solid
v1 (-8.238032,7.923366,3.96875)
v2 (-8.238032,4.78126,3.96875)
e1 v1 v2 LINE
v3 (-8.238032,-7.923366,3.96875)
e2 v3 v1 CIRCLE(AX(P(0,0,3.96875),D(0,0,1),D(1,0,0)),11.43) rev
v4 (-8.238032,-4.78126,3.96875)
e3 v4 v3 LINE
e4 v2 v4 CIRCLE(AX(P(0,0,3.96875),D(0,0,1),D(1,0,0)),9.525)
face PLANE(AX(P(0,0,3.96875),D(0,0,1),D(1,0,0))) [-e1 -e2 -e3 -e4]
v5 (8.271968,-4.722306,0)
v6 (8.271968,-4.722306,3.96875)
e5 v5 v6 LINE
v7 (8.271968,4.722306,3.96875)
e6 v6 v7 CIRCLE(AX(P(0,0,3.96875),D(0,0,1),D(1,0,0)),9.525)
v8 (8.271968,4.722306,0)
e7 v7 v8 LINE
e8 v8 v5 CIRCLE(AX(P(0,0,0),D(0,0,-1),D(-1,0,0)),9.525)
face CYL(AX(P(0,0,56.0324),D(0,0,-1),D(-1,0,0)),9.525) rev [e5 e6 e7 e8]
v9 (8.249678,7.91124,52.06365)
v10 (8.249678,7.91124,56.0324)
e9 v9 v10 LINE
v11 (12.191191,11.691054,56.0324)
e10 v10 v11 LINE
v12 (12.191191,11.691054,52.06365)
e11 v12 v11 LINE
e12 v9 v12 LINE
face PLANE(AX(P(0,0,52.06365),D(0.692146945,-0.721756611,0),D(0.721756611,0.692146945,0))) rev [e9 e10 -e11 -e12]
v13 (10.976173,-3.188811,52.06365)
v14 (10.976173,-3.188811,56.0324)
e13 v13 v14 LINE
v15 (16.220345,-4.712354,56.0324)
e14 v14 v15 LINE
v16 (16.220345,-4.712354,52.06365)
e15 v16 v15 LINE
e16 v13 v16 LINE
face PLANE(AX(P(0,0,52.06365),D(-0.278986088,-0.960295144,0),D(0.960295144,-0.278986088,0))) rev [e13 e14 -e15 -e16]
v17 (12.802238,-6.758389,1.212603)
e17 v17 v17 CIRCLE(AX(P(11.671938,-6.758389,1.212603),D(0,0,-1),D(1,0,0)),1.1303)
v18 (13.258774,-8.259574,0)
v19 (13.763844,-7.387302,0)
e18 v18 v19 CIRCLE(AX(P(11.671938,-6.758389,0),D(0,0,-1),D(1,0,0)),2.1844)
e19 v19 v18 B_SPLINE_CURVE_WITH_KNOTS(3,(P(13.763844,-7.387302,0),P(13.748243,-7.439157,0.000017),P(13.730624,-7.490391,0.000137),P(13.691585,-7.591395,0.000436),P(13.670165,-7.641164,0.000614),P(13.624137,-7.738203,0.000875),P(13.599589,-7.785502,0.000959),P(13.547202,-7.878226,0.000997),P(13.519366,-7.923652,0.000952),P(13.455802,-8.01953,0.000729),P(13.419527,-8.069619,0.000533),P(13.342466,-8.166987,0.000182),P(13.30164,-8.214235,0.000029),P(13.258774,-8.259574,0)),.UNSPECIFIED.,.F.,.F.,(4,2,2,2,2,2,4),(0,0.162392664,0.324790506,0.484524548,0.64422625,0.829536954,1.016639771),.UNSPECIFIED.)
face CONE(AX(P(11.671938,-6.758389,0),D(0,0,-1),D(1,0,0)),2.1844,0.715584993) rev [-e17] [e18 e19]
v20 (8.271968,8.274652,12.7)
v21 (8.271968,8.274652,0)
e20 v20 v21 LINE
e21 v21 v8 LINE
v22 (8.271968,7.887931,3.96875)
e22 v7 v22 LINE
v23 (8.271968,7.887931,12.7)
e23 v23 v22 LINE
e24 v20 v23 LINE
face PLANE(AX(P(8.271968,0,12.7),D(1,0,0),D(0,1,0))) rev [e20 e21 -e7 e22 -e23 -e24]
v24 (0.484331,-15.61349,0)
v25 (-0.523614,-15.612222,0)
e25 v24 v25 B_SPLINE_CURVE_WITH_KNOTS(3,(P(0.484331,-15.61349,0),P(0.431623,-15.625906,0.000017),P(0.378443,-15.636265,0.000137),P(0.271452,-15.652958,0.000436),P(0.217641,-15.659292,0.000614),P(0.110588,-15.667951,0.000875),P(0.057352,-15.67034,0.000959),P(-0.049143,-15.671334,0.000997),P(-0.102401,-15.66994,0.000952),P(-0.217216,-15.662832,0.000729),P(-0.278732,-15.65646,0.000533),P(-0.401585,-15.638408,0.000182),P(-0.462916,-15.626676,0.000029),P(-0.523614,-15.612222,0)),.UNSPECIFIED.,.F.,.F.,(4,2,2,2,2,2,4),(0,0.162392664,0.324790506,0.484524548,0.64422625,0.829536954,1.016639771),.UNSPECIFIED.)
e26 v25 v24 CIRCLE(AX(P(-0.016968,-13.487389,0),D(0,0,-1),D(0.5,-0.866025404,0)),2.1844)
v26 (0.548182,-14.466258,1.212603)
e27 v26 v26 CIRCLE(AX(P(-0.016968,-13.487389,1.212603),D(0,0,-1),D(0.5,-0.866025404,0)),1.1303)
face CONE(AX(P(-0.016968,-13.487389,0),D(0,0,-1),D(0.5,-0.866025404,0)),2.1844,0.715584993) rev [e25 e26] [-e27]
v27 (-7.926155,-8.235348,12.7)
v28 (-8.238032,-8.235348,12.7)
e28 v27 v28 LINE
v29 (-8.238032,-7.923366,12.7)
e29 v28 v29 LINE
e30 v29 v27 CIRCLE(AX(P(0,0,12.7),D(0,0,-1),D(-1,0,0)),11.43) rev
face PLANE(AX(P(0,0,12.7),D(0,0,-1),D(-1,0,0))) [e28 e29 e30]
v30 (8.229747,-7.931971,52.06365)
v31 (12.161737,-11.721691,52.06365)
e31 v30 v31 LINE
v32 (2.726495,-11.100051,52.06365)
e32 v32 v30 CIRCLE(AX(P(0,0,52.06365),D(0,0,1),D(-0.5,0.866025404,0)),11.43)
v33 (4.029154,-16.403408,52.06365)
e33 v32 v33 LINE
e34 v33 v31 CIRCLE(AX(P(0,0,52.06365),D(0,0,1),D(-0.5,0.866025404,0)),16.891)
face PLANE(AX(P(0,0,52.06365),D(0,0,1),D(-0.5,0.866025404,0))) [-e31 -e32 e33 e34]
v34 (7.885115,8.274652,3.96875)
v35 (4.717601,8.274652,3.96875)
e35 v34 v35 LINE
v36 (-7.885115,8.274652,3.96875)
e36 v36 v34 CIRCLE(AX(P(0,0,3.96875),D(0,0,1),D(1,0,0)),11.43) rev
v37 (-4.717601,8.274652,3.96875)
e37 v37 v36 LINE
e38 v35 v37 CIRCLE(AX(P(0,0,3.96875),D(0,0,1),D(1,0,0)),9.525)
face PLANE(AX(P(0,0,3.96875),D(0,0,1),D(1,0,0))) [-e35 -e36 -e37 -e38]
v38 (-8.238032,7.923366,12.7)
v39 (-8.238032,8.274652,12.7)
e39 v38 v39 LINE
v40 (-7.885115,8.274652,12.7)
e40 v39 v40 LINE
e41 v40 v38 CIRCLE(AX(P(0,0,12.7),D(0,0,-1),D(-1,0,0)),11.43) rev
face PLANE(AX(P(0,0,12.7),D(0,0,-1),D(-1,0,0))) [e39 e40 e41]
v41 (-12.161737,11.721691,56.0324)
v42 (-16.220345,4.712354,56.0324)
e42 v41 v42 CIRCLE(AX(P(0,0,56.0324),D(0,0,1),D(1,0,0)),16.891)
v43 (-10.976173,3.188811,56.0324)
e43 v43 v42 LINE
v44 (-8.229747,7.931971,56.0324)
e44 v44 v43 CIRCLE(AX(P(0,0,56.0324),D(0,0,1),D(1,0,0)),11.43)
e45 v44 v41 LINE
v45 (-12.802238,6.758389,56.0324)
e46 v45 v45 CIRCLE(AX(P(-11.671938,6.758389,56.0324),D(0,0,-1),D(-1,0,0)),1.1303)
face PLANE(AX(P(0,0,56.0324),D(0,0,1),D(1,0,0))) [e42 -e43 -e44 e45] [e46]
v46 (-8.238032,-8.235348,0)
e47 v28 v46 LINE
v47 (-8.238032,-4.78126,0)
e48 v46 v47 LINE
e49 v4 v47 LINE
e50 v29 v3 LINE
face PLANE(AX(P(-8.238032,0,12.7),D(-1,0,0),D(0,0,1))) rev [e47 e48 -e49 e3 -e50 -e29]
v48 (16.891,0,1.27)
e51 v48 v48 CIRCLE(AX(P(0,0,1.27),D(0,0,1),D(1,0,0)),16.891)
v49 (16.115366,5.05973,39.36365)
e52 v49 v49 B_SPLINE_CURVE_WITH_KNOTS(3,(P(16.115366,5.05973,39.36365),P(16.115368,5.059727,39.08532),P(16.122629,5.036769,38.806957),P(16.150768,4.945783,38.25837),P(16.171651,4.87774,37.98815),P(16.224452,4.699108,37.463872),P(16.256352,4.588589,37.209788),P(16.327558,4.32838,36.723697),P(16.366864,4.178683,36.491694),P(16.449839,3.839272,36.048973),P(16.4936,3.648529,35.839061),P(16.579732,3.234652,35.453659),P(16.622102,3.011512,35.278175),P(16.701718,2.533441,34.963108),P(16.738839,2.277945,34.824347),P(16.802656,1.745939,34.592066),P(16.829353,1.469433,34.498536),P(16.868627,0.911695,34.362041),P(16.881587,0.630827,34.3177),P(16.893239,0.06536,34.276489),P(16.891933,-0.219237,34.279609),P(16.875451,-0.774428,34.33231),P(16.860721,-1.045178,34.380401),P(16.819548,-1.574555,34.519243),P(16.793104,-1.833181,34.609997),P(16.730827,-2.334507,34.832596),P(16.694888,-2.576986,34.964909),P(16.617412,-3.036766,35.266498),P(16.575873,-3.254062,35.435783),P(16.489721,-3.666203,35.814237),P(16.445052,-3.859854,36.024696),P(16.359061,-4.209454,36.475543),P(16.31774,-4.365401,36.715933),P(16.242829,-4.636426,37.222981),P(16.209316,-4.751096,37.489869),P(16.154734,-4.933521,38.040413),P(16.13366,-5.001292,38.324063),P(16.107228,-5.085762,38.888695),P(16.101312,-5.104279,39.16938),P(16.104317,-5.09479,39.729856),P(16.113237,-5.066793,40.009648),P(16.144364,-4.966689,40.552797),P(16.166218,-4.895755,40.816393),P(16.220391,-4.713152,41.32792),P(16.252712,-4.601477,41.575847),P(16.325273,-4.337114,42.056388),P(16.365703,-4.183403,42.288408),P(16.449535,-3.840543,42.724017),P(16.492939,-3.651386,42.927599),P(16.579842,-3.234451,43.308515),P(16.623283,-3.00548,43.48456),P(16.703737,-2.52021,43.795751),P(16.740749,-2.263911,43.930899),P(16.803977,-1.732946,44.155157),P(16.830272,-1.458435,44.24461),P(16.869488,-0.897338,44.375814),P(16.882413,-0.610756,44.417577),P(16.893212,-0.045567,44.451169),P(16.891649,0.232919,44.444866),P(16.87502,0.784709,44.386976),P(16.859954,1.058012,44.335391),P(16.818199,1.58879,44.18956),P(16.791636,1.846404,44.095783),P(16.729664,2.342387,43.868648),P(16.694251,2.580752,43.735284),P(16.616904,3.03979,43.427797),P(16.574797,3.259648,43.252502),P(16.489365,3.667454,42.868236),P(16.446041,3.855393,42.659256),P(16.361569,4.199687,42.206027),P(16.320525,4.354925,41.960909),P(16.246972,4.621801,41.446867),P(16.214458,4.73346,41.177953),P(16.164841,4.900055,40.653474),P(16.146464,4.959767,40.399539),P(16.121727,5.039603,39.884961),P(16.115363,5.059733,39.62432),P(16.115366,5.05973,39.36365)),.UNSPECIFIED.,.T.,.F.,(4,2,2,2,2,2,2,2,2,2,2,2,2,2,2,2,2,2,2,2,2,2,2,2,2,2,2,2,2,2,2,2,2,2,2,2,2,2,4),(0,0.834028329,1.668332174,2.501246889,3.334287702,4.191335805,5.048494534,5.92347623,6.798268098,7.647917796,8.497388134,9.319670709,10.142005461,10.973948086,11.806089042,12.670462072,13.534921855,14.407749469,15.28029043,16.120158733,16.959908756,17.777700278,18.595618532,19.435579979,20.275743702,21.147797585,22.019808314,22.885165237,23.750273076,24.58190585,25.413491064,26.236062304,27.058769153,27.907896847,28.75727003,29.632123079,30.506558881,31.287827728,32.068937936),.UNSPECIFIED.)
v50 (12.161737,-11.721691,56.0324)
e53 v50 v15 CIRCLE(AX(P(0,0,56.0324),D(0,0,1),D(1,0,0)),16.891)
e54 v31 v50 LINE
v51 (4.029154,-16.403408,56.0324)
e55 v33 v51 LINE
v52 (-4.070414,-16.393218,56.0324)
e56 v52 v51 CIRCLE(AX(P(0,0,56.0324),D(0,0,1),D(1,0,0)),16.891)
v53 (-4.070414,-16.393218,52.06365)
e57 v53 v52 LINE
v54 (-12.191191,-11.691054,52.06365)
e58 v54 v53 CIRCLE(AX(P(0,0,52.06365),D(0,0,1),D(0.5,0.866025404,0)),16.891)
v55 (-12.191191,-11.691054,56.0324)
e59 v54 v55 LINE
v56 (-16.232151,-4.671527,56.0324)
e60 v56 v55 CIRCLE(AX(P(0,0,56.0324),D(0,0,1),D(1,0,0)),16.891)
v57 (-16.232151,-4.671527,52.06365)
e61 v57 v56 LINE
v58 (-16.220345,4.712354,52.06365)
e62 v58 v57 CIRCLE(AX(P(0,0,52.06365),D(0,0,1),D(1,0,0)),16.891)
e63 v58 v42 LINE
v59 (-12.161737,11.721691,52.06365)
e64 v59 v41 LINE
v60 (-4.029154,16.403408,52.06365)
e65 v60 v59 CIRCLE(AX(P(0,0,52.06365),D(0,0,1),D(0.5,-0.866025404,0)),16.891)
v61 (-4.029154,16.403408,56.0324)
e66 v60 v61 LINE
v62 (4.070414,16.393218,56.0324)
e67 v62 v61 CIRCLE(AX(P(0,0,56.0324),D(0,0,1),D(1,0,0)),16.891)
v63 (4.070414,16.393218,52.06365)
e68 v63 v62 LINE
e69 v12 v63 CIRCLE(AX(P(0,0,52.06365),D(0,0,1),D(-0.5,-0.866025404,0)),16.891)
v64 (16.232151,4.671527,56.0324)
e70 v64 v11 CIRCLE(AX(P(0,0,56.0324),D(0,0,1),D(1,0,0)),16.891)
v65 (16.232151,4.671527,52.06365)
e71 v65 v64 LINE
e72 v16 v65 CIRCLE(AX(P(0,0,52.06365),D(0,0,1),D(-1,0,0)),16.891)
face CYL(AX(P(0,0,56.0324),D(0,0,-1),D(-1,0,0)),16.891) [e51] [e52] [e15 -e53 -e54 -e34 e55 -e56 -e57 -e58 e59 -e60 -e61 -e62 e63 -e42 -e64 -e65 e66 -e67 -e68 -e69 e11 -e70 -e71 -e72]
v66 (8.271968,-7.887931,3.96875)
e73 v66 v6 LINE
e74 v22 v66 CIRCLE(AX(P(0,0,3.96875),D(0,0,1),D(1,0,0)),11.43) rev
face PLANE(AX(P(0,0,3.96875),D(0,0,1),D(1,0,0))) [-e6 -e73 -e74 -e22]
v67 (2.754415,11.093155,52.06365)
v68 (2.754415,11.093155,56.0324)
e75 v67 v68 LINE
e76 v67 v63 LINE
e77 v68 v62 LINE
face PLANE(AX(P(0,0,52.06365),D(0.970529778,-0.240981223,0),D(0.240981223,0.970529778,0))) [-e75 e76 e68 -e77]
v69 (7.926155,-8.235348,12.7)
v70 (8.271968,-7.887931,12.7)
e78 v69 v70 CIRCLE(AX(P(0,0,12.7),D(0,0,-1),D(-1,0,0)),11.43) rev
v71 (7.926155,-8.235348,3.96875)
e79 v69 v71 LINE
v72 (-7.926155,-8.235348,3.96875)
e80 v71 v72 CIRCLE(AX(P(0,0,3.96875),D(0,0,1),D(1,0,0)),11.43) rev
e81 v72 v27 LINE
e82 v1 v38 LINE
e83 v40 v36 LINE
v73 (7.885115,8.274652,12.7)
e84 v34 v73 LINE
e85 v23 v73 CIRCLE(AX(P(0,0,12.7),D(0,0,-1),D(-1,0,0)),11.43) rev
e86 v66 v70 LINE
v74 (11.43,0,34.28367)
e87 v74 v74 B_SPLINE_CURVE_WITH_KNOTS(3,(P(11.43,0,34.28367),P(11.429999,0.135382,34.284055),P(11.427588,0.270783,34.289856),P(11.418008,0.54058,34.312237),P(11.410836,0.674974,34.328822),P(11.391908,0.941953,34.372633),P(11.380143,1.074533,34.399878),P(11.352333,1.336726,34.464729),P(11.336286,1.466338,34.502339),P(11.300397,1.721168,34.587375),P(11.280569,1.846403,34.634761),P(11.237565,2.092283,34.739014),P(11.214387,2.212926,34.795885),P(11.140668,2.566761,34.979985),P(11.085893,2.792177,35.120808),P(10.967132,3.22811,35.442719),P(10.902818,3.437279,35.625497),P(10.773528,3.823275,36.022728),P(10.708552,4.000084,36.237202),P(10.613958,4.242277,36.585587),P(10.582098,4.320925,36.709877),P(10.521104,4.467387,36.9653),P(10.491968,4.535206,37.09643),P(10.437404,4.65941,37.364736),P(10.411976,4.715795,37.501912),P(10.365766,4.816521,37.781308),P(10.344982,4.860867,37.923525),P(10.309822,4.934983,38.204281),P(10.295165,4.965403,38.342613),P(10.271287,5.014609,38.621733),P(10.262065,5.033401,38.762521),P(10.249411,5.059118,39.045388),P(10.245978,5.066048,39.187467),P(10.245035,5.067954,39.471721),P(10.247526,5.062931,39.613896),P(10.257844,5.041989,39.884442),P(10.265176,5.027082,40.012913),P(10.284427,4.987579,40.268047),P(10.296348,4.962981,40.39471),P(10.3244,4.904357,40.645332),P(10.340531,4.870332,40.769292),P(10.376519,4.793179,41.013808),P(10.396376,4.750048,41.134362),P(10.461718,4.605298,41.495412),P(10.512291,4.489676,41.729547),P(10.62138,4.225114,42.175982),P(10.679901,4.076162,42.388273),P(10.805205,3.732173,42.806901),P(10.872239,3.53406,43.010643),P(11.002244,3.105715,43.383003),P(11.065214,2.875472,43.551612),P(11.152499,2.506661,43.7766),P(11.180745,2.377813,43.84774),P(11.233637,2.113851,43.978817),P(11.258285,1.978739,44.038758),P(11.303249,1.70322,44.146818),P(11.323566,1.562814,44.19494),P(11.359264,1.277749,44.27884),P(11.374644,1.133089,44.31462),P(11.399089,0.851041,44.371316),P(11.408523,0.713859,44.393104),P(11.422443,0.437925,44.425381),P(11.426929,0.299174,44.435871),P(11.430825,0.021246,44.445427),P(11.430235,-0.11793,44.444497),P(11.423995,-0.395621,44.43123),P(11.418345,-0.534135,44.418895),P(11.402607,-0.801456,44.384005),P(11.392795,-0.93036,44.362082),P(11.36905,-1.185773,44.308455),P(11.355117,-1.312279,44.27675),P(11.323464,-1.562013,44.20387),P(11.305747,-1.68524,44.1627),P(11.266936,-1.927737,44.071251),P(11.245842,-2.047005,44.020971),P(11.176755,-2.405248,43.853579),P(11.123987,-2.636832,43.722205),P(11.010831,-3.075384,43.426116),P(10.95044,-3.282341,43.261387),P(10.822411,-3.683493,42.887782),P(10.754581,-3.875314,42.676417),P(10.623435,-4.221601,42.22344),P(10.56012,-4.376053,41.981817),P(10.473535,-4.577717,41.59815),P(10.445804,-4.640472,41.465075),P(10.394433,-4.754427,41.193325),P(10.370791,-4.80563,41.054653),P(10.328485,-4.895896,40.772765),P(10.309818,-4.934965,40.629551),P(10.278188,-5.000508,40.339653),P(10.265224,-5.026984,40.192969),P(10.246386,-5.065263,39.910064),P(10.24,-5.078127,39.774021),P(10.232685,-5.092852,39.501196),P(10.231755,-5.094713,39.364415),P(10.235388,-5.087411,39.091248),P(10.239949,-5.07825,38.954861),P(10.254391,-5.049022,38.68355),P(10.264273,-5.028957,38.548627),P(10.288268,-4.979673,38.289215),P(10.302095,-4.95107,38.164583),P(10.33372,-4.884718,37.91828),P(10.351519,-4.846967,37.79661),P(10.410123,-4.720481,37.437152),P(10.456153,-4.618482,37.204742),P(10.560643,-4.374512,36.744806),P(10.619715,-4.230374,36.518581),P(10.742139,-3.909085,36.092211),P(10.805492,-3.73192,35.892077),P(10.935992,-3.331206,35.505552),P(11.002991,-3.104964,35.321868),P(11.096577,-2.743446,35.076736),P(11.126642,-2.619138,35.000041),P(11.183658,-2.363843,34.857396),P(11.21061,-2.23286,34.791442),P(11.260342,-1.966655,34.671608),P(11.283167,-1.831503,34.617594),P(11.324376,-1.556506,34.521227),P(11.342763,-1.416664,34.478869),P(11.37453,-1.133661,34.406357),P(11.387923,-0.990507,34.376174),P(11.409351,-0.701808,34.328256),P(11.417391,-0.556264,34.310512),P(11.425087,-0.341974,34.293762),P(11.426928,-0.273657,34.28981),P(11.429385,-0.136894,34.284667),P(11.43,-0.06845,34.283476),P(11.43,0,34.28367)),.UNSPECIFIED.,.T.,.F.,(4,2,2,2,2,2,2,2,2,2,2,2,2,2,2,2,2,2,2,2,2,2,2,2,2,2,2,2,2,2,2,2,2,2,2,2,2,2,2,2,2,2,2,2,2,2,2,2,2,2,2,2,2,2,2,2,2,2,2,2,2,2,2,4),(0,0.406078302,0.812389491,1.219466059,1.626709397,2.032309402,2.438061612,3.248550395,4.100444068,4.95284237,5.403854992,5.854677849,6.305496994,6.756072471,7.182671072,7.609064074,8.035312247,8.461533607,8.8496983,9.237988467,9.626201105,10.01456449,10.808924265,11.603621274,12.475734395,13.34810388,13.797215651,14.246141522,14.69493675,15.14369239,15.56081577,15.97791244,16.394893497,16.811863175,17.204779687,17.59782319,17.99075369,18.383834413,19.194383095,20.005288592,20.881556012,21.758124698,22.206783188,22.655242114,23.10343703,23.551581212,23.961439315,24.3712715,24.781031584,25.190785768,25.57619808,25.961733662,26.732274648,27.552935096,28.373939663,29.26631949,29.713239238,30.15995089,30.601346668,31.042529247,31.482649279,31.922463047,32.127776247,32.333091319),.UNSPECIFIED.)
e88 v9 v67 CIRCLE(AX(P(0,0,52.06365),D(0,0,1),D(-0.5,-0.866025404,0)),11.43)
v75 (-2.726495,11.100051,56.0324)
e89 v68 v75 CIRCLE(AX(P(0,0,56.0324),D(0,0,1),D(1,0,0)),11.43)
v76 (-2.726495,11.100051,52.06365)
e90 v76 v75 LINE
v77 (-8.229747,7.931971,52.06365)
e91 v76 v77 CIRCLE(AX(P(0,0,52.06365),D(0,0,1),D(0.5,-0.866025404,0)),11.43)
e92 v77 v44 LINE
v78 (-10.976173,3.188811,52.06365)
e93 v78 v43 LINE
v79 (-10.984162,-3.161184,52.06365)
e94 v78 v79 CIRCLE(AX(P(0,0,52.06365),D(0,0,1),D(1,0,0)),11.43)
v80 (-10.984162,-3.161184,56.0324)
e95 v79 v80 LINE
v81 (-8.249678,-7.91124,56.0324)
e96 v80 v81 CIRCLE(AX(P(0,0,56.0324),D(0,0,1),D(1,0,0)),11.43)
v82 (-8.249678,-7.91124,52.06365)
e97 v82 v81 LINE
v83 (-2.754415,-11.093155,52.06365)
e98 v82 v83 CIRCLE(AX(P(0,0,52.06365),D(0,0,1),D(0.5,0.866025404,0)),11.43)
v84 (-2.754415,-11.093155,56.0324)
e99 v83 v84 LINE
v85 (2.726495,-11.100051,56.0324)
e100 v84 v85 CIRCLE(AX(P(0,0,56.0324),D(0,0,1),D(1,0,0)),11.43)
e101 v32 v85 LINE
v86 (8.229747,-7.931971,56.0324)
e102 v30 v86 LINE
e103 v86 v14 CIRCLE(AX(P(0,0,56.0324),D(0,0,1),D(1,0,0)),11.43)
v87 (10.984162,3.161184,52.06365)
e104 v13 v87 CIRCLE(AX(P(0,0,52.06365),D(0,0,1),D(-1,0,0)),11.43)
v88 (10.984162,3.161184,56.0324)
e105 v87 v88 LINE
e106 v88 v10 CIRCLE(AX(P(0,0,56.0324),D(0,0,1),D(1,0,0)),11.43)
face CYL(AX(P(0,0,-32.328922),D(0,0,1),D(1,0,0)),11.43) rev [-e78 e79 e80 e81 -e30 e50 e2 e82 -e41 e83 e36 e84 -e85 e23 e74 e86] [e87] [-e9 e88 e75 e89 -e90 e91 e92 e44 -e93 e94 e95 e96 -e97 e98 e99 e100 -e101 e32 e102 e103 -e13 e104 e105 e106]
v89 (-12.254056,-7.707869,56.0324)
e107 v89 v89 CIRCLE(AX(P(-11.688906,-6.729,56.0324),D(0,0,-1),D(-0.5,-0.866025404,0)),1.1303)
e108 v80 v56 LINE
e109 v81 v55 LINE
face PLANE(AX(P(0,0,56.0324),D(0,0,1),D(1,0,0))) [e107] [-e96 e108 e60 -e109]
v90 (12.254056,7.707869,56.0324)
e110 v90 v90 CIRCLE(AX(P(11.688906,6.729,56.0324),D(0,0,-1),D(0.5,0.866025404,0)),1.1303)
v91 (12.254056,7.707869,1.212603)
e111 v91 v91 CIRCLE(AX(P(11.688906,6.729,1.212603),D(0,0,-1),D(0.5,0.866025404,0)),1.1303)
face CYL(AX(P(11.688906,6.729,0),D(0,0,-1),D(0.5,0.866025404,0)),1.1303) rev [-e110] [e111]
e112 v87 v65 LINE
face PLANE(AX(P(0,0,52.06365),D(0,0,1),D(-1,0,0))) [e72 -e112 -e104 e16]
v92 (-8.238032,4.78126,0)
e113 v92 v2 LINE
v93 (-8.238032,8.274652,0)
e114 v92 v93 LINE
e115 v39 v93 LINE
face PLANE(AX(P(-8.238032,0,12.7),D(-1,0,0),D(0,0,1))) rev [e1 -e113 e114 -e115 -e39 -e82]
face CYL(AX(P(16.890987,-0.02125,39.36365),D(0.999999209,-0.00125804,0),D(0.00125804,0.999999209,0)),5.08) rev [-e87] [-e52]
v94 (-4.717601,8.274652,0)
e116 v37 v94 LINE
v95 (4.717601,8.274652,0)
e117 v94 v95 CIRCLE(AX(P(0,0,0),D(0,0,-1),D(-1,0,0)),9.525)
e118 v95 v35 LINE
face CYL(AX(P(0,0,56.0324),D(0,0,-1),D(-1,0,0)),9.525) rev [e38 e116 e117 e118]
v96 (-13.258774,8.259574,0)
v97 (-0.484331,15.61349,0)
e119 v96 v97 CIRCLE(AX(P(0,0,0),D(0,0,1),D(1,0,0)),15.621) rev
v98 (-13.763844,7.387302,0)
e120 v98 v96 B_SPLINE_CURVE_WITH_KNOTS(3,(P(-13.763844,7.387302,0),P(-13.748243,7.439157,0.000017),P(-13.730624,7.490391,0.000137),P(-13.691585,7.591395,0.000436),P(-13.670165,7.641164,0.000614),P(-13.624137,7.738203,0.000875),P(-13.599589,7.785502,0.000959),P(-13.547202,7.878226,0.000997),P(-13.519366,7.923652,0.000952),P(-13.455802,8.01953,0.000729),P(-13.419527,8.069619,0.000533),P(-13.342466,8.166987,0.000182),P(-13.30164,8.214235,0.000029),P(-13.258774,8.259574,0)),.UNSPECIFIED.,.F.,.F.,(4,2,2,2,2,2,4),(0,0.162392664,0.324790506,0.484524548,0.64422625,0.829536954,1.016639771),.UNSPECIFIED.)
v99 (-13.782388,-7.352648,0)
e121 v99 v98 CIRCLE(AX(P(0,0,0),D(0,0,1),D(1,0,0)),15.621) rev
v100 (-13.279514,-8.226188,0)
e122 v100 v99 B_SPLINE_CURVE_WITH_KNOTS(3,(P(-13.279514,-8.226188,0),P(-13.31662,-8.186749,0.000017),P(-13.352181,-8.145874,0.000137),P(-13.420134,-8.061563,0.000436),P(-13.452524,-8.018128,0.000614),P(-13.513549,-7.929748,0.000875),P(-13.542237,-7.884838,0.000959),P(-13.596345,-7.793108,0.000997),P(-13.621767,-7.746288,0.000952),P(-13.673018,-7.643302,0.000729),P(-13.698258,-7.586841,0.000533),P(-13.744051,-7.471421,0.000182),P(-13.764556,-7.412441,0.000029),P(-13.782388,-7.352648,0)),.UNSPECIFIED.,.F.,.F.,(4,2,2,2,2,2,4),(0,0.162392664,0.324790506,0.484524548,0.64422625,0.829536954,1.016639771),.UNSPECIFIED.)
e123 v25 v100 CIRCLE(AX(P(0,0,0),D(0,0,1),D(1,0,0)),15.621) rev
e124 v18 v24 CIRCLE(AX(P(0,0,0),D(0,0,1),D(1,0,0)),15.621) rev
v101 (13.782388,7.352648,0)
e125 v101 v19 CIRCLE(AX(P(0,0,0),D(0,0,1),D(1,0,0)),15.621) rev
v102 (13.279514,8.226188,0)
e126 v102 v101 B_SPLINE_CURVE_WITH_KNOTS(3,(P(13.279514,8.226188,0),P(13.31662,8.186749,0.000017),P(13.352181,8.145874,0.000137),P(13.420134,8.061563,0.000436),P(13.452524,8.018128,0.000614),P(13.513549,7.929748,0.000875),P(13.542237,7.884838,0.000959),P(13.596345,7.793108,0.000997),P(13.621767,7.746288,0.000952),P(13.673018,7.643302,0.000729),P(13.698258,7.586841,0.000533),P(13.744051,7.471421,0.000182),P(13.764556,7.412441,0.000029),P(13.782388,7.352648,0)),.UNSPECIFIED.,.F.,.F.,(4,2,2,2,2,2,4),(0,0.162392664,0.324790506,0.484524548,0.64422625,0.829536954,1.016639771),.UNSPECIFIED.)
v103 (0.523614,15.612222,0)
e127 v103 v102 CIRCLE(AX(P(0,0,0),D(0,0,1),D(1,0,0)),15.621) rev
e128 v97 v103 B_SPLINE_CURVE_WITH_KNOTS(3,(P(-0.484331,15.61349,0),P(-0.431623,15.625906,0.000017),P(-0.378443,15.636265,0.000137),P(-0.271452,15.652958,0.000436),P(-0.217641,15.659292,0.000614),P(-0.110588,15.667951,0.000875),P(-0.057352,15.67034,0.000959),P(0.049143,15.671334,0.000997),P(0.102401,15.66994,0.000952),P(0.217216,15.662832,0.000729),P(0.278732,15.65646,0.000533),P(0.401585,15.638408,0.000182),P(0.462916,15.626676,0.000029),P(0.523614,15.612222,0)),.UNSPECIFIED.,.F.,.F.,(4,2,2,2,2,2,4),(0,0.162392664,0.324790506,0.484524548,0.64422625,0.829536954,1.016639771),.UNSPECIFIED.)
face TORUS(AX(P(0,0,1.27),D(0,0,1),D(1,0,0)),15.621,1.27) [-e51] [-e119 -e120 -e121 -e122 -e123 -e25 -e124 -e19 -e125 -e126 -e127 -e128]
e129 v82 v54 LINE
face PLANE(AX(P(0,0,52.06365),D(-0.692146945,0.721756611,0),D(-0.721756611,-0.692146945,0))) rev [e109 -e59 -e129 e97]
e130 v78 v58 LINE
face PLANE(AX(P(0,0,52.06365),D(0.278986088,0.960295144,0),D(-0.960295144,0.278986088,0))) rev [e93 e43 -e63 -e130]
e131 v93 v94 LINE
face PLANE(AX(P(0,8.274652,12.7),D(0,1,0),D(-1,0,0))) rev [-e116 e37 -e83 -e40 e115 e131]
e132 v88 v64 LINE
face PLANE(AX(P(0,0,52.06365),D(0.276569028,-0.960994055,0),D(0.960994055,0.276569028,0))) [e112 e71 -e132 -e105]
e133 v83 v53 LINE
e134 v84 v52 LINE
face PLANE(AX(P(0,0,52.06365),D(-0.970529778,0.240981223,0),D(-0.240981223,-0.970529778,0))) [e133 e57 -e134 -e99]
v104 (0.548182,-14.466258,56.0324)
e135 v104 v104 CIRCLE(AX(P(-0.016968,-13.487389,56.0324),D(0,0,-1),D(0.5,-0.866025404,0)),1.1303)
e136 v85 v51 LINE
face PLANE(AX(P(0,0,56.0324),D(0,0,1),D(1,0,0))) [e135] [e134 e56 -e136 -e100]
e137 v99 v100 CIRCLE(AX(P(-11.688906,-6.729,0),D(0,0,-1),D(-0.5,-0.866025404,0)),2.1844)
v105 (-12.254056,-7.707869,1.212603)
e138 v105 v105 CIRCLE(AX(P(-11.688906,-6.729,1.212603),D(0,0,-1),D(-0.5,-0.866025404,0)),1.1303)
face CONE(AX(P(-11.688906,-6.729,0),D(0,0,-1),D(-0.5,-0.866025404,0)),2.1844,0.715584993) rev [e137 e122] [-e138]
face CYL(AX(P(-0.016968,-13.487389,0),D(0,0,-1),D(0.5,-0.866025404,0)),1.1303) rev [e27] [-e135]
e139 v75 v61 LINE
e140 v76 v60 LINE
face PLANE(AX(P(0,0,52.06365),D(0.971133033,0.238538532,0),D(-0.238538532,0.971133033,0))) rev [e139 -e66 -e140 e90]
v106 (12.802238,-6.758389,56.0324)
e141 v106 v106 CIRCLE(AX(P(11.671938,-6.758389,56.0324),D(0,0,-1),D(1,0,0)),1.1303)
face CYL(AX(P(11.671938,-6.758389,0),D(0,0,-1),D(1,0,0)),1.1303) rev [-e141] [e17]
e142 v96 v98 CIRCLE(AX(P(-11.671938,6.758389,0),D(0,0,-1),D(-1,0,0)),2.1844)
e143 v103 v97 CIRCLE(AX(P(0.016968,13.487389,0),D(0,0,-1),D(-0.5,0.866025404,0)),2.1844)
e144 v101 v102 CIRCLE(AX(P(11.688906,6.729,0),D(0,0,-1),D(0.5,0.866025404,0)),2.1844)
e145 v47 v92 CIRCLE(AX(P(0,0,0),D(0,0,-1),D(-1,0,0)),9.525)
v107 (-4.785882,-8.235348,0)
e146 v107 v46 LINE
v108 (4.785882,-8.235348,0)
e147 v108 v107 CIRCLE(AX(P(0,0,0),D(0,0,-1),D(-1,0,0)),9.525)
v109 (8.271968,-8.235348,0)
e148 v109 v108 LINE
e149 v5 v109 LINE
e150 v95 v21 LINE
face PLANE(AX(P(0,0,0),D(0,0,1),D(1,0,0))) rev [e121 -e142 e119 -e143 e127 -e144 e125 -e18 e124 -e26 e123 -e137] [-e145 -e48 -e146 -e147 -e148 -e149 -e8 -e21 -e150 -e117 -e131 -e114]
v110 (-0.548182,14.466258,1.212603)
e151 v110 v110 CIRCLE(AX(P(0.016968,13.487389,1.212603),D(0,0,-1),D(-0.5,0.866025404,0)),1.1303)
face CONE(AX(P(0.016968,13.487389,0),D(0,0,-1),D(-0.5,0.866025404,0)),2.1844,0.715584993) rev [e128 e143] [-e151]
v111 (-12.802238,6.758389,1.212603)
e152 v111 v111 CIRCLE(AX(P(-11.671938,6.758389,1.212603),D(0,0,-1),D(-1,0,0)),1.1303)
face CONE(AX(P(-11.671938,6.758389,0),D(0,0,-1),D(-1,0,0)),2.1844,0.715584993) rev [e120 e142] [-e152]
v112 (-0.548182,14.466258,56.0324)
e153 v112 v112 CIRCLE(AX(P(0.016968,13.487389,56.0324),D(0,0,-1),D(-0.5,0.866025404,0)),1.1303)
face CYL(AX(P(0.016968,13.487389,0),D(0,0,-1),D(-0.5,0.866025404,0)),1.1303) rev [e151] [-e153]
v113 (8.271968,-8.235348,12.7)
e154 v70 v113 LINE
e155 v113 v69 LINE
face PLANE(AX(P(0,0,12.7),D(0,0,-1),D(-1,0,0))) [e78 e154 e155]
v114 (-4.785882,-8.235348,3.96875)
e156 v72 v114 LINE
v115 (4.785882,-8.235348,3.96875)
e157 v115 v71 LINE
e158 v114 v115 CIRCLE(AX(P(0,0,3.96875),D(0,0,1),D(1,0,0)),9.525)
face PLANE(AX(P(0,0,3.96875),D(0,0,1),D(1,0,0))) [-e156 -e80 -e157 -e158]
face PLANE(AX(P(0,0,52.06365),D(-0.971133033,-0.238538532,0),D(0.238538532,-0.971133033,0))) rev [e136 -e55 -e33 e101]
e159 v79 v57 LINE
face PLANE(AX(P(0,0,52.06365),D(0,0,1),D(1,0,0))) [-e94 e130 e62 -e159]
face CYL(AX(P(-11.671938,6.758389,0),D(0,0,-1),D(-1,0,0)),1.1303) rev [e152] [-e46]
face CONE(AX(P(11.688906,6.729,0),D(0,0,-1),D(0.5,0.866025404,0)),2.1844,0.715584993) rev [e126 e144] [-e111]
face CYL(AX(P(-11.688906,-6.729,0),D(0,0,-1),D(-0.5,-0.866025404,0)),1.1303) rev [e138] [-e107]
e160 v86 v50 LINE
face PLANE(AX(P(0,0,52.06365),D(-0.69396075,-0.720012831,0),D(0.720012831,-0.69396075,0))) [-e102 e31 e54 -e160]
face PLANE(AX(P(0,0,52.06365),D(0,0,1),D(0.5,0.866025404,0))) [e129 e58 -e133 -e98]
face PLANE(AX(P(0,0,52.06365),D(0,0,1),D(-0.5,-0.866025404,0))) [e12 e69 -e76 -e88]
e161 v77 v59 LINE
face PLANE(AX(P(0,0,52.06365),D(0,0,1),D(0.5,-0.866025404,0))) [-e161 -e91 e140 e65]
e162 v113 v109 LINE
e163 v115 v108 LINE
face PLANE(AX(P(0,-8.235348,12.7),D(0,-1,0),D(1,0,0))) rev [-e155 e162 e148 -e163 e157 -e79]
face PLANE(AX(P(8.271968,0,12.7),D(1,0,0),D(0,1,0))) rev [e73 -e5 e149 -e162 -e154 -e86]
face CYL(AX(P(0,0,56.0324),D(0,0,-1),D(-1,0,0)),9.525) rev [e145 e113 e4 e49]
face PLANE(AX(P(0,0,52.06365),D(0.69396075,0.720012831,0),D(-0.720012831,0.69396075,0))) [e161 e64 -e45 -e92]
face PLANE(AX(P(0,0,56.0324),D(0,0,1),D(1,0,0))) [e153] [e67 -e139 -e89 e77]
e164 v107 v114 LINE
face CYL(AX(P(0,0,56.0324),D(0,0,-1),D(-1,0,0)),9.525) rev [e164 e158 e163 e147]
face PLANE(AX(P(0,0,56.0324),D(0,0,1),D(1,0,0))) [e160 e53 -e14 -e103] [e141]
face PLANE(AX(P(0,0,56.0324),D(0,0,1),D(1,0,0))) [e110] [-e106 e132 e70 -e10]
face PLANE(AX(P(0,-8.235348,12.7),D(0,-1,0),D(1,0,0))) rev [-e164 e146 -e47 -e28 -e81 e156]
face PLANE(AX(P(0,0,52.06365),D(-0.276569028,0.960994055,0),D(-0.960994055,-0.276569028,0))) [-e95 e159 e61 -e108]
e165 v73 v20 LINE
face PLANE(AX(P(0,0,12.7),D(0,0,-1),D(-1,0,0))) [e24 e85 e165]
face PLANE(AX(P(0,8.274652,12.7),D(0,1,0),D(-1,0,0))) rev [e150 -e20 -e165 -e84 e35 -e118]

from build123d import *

# Parameters (mm, degrees)
SKETCH1_R                                      = 16.891
BOSS_EXTRUDE1_DEPTH                            = 56.0324
SKETCH9_R                                      = 9.525
CUT_EXTRUDE6_DEPTH                             = 61.911752657
SKETCH10_R                                     = 11.43
BOSS_EXTRUDE2_DEPTH                            = 19.05
CUT_EXTRUDE7_START                             = -52.06365
SKETCH11_R                                     = 9.525
CUT_EXTRUDE7_DEPTH                             = 52.06365
CUT_EXTRUDE8_START                             = -3.96875
CUT_EXTRUDE8_DEPTH                             = 3.96875
CSK_FOR_2_FLAT_HEAD_MACHINE_SCREW1_D           = 2.2606
CSK_FOR_2_FLAT_HEAD_MACHINE_SCREW1_CSINK_D     = 4.3688
CSK_FOR_2_FLAT_HEAD_MACHINE_SCREW1_CSINK_ANGLE = 82
CIRPATTERN1_COUNT                              = 6
F_1_2_0_4_DIAMETER_HOLE1_D                     = 10.16
F_1_2_0_4_DIAMETER_HOLE1_DEPTH                 = 12.7
F_1_2_0_4_DIAMETER_HOLE1_TIP                   = 3.052371945
FILLET1_R                                      = 1.27
CUT_EXTRUDE9_START                             = -12.7
SKETCH17_W                                     = 16.51
SKETCH17_H                                     = 16.51
CUT_EXTRUDE9_DEPTH                             = 12.7


with BuildPart() as part:
    # Sketch1 → Boss-Extrude1 (new body)
    with BuildSketch(Plane.XY):
        Circle(SKETCH1_R)
    extrude(amount=BOSS_EXTRUDE1_DEPTH)

    # Sketch9 → Cut-Extrude6 (cut, through all)
    with BuildSketch(Plane(origin=(0, 0, 0), x_dir=(-1, 0, 0), z_dir=(0, 0, -1))):
        Circle(SKETCH9_R)
        with BuildLine():
            ThreePointArc((-5.359640753, -7.874), (0, -9.525), (5.359640753, -7.874))
            Line((5.359640753, -7.874), (-5.359640753, -7.874))
        make_face()
        with BuildLine():
            ThreePointArc((-7.874, 5.359640753), (-9.525, 0), (-7.874, -5.359640753))
            Line((-7.874, -5.359640753), (-7.874, 5.359640753))
        make_face()
        with BuildLine():
            Line((-5.359640753, 7.874), (5.359640753, 7.874))
            ThreePointArc((5.359640753, 7.874), (0, 9.525), (-5.359640753, 7.874))
        make_face()
        with BuildLine():
            Line((7.874, 5.359640753), (7.874, -5.359640753))
            ThreePointArc((7.874, -5.359640753), (9.102897204, -2.804084075), (9.525, 0))
            ThreePointArc((9.525, 0), (9.102897204, 2.804084075), (7.874, 5.359640753))
        make_face()
    extrude(amount=-CUT_EXTRUDE6_DEPTH, mode=Mode.SUBTRACT)

    # Sketch10 → Boss-Extrude2 (add)
    # profile 1 of 2: a face of its own
    with BuildSketch(Plane(origin=(0, 0, 0), x_dir=(-1, 0, 0), z_dir=(0, 0, -1))):
        Circle(SKETCH10_R)
        with BuildLine():
            ThreePointArc((-5.359640753, -7.874), (-4.453933477, 8.419507206), (9.525, 0))
            ThreePointArc((9.525, 0), (8.419507206, -4.453933477), (5.359640753, -7.874))
            ThreePointArc((5.359640753, -7.874), (0, -9.525), (-5.359640753, -7.874))
        make_face(mode=Mode.SUBTRACT)
    # profile 2 of 2: a face of its own
    with BuildSketch(Plane(origin=(0, 0, 0), x_dir=(-1, 0, 0), z_dir=(0, 0, -1))):
        Circle(SKETCH10_R)
        with BuildLine():
            ThreePointArc((-5.359640753, -7.874), (-4.453933477, 8.419507206), (9.525, 0))
            ThreePointArc((9.525, 0), (8.419507206, -4.453933477), (5.359640753, -7.874))
            ThreePointArc((5.359640753, -7.874), (0, -9.525), (-5.359640753, -7.874))
        make_face(mode=Mode.SUBTRACT)
    extrude(amount=-BOSS_EXTRUDE2_DEPTH)

    # Sketch11 → Cut-Extrude7 (cut)
    with BuildSketch(Plane.XY.offset(56.0324).offset(CUT_EXTRUDE7_START)):
        with BuildLine():
            Line((-9.153468369, -2.634319991), (-10.984162043, -3.161183989))
            ThreePointArc((-10.984162043, -3.161183989), (1.596234295, -11.317991698), (11.43, 0))
            ThreePointArc((11.43, 0), (1.610471515, 11.315974615), (-10.976173491, 3.188810986))
            Line((-10.976173491, 3.188810986), (-9.146811242, 2.657342489))
            ThreePointArc((-9.146811242, 2.657342489), (1.342059596, 9.429978846), (9.525, 0))
            ThreePointArc((9.525, 0), (1.330195246, -9.431659748), (-9.153468369, -2.634319991))
        make_face()
        with Locations(Location((0, 0, 0), (0, 0, 180))):
            Circle(SKETCH11_R)
        with BuildLine():
            ThreePointArc((-10.984162043, -3.161183989), (-11.297244321, 0.014212394), (-10.976173491, 3.188810986))
            Line((-10.976173491, 3.188810986), (0, 0))
            Line((0, 0), (-10.984162043, -3.161183989))
        make_face()
        with BuildLine():
            ThreePointArc((-10.976173491, 3.188810986), (-11.429990955, 0.014379395), (-10.984162043, -3.161183989))
            ThreePointArc((-10.984162043, -3.161183989), (-11.297244321, 0.014212394), (-10.976173491, 3.188810986))
        make_face()
    extrude(amount=CUT_EXTRUDE7_DEPTH, mode=Mode.SUBTRACT)

    # Sketch11<4> → Cut-Extrude8 (cut)
    with BuildSketch(Plane.XY.offset(56.0324).offset(CUT_EXTRUDE8_START)):
        with BuildLine():
            ThreePointArc((-10.976173491, 3.188810986), (-11.297244321, 0.014212394), (-10.984162043, -3.161183989))
            Line((-10.984162043, -3.161183989), (0, 0))
            Line((0, 0), (-10.976173491, 3.188810986))
        make_face()
        with BuildLine():
            ThreePointArc((-10.976173491, 3.188810986), (-11.429990955, 0.014379395), (-10.984162043, -3.161183989))
            ThreePointArc((-10.984162043, -3.161183989), (-11.297244321, 0.014212394), (-10.976173491, 3.188810986))
        make_face()
        with BuildLine():
            Line((-16.232150575, -4.67152745), (-10.984162043, -3.161183989))
            ThreePointArc((-10.984162043, -3.161183989), (-11.429990955, 0.014379395), (-10.976173491, 3.188810986))
            Line((-10.976173491, 3.188810986), (-16.220345269, 4.712354013))
            ThreePointArc((-16.220345269, 4.712354013), (-16.925737574, 0.021293268), (-16.232150575, -4.67152745))
        make_face()
        with BuildLine():
            Line((0, 0), (-10.984162043, -3.161183989))
            ThreePointArc((-10.984162043, -3.161183989), (1.596234295, -11.317991698), (11.43, 0))
            ThreePointArc((11.43, 0), (1.610471515, 11.315974615), (-10.976173491, 3.188810986))
            Line((-10.976173491, 3.188810986), (0, 0))
        make_face()
    cut_extrude8 = extrude(amount=CUT_EXTRUDE8_DEPTH, mode=Mode.SUBTRACT)

    # CSK for #2 Flat Head Machine Screw1 (through all)
    with Locations(Plane(origin=(0, 0, 0), x_dir=(-1, 0, 0), z_dir=(0, 0, -1))):
        with Locations((11.671937945, 6.75838911)):
            csk_for_2_flat_head_machine_screw1 = CounterSinkHole(CSK_FOR_2_FLAT_HEAD_MACHINE_SCREW1_D / 2, CSK_FOR_2_FLAT_HEAD_MACHINE_SCREW1_CSINK_D / 2, counter_sink_angle=CSK_FOR_2_FLAT_HEAD_MACHINE_SCREW1_CSINK_ANGLE)

    # CirPattern1: Cut-Extrude8, CSK for #2 Flat Head Machine Screw1 ×6 about axis
    cirpattern1_axis = Axis((0, 0, 0), (0, 0, 1))
    add([cut_extrude8.rotate(cirpattern1_axis, i * 360 / CIRPATTERN1_COUNT) for i in range(1, CIRPATTERN1_COUNT)], mode=Mode.SUBTRACT)
    add([csk_for_2_flat_head_machine_screw1.rotate(cirpattern1_axis, i * 360 / CIRPATTERN1_COUNT) for i in range(1, CIRPATTERN1_COUNT)], mode=Mode.SUBTRACT)

    # 1/2 (0.4) Diameter Hole1
    with Locations(Plane(origin=(16.890986634, -0.02124955, 39.36365), x_dir=(0.001258039772, 0.999999208668, 0), z_dir=(0.999999208668, -0.001258039772, 0))):
        with Locations((0, 0)):
            Hole(F_1_2_0_4_DIAMETER_HOLE1_D / 2, depth=F_1_2_0_4_DIAMETER_HOLE1_DEPTH)
            with Locations((0, 0, -(F_1_2_0_4_DIAMETER_HOLE1_DEPTH + F_1_2_0_4_DIAMETER_HOLE1_TIP / 2))):  # 118° drill point
                Cone(0, F_1_2_0_4_DIAMETER_HOLE1_D / 2, F_1_2_0_4_DIAMETER_HOLE1_TIP, mode=Mode.SUBTRACT)

    # Fillet1
    # the kernel refuses this fillet: 1.27 mm, written as the material it takes off along each edge
    with BuildSketch(Plane(origin=(0, 0, 0), x_dir=(1, 0, 0), z_dir=(0, -1, 0))) as fillet1_piece_1:
        with BuildLine():
            CenterArc((16.891 - FILLET1_R, FILLET1_R), FILLET1_R, 270, 90)
            Line((16.891 - FILLET1_R, 0), (16.891, 0))
            Line((16.891, 0), (16.891, FILLET1_R))
        make_face()
    revolve(axis=Axis((0, 0, 0), (0, 0, 1)), mode=Mode.SUBTRACT)

    # Sketch17 → Cut-Extrude9 (cut)
    with BuildSketch(Plane(origin=(0, 0, 0), x_dir=(-1, 0, 0), z_dir=(0, 0, -1)).offset(CUT_EXTRUDE9_START)):
        with Locations((-0.016967686, 0.019651839)):
            Rectangle(SKETCH17_W, SKETCH17_H)
    extrude(amount=CUT_EXTRUDE9_DEPTH, mode=Mode.SUBTRACT)


solid = part.part
